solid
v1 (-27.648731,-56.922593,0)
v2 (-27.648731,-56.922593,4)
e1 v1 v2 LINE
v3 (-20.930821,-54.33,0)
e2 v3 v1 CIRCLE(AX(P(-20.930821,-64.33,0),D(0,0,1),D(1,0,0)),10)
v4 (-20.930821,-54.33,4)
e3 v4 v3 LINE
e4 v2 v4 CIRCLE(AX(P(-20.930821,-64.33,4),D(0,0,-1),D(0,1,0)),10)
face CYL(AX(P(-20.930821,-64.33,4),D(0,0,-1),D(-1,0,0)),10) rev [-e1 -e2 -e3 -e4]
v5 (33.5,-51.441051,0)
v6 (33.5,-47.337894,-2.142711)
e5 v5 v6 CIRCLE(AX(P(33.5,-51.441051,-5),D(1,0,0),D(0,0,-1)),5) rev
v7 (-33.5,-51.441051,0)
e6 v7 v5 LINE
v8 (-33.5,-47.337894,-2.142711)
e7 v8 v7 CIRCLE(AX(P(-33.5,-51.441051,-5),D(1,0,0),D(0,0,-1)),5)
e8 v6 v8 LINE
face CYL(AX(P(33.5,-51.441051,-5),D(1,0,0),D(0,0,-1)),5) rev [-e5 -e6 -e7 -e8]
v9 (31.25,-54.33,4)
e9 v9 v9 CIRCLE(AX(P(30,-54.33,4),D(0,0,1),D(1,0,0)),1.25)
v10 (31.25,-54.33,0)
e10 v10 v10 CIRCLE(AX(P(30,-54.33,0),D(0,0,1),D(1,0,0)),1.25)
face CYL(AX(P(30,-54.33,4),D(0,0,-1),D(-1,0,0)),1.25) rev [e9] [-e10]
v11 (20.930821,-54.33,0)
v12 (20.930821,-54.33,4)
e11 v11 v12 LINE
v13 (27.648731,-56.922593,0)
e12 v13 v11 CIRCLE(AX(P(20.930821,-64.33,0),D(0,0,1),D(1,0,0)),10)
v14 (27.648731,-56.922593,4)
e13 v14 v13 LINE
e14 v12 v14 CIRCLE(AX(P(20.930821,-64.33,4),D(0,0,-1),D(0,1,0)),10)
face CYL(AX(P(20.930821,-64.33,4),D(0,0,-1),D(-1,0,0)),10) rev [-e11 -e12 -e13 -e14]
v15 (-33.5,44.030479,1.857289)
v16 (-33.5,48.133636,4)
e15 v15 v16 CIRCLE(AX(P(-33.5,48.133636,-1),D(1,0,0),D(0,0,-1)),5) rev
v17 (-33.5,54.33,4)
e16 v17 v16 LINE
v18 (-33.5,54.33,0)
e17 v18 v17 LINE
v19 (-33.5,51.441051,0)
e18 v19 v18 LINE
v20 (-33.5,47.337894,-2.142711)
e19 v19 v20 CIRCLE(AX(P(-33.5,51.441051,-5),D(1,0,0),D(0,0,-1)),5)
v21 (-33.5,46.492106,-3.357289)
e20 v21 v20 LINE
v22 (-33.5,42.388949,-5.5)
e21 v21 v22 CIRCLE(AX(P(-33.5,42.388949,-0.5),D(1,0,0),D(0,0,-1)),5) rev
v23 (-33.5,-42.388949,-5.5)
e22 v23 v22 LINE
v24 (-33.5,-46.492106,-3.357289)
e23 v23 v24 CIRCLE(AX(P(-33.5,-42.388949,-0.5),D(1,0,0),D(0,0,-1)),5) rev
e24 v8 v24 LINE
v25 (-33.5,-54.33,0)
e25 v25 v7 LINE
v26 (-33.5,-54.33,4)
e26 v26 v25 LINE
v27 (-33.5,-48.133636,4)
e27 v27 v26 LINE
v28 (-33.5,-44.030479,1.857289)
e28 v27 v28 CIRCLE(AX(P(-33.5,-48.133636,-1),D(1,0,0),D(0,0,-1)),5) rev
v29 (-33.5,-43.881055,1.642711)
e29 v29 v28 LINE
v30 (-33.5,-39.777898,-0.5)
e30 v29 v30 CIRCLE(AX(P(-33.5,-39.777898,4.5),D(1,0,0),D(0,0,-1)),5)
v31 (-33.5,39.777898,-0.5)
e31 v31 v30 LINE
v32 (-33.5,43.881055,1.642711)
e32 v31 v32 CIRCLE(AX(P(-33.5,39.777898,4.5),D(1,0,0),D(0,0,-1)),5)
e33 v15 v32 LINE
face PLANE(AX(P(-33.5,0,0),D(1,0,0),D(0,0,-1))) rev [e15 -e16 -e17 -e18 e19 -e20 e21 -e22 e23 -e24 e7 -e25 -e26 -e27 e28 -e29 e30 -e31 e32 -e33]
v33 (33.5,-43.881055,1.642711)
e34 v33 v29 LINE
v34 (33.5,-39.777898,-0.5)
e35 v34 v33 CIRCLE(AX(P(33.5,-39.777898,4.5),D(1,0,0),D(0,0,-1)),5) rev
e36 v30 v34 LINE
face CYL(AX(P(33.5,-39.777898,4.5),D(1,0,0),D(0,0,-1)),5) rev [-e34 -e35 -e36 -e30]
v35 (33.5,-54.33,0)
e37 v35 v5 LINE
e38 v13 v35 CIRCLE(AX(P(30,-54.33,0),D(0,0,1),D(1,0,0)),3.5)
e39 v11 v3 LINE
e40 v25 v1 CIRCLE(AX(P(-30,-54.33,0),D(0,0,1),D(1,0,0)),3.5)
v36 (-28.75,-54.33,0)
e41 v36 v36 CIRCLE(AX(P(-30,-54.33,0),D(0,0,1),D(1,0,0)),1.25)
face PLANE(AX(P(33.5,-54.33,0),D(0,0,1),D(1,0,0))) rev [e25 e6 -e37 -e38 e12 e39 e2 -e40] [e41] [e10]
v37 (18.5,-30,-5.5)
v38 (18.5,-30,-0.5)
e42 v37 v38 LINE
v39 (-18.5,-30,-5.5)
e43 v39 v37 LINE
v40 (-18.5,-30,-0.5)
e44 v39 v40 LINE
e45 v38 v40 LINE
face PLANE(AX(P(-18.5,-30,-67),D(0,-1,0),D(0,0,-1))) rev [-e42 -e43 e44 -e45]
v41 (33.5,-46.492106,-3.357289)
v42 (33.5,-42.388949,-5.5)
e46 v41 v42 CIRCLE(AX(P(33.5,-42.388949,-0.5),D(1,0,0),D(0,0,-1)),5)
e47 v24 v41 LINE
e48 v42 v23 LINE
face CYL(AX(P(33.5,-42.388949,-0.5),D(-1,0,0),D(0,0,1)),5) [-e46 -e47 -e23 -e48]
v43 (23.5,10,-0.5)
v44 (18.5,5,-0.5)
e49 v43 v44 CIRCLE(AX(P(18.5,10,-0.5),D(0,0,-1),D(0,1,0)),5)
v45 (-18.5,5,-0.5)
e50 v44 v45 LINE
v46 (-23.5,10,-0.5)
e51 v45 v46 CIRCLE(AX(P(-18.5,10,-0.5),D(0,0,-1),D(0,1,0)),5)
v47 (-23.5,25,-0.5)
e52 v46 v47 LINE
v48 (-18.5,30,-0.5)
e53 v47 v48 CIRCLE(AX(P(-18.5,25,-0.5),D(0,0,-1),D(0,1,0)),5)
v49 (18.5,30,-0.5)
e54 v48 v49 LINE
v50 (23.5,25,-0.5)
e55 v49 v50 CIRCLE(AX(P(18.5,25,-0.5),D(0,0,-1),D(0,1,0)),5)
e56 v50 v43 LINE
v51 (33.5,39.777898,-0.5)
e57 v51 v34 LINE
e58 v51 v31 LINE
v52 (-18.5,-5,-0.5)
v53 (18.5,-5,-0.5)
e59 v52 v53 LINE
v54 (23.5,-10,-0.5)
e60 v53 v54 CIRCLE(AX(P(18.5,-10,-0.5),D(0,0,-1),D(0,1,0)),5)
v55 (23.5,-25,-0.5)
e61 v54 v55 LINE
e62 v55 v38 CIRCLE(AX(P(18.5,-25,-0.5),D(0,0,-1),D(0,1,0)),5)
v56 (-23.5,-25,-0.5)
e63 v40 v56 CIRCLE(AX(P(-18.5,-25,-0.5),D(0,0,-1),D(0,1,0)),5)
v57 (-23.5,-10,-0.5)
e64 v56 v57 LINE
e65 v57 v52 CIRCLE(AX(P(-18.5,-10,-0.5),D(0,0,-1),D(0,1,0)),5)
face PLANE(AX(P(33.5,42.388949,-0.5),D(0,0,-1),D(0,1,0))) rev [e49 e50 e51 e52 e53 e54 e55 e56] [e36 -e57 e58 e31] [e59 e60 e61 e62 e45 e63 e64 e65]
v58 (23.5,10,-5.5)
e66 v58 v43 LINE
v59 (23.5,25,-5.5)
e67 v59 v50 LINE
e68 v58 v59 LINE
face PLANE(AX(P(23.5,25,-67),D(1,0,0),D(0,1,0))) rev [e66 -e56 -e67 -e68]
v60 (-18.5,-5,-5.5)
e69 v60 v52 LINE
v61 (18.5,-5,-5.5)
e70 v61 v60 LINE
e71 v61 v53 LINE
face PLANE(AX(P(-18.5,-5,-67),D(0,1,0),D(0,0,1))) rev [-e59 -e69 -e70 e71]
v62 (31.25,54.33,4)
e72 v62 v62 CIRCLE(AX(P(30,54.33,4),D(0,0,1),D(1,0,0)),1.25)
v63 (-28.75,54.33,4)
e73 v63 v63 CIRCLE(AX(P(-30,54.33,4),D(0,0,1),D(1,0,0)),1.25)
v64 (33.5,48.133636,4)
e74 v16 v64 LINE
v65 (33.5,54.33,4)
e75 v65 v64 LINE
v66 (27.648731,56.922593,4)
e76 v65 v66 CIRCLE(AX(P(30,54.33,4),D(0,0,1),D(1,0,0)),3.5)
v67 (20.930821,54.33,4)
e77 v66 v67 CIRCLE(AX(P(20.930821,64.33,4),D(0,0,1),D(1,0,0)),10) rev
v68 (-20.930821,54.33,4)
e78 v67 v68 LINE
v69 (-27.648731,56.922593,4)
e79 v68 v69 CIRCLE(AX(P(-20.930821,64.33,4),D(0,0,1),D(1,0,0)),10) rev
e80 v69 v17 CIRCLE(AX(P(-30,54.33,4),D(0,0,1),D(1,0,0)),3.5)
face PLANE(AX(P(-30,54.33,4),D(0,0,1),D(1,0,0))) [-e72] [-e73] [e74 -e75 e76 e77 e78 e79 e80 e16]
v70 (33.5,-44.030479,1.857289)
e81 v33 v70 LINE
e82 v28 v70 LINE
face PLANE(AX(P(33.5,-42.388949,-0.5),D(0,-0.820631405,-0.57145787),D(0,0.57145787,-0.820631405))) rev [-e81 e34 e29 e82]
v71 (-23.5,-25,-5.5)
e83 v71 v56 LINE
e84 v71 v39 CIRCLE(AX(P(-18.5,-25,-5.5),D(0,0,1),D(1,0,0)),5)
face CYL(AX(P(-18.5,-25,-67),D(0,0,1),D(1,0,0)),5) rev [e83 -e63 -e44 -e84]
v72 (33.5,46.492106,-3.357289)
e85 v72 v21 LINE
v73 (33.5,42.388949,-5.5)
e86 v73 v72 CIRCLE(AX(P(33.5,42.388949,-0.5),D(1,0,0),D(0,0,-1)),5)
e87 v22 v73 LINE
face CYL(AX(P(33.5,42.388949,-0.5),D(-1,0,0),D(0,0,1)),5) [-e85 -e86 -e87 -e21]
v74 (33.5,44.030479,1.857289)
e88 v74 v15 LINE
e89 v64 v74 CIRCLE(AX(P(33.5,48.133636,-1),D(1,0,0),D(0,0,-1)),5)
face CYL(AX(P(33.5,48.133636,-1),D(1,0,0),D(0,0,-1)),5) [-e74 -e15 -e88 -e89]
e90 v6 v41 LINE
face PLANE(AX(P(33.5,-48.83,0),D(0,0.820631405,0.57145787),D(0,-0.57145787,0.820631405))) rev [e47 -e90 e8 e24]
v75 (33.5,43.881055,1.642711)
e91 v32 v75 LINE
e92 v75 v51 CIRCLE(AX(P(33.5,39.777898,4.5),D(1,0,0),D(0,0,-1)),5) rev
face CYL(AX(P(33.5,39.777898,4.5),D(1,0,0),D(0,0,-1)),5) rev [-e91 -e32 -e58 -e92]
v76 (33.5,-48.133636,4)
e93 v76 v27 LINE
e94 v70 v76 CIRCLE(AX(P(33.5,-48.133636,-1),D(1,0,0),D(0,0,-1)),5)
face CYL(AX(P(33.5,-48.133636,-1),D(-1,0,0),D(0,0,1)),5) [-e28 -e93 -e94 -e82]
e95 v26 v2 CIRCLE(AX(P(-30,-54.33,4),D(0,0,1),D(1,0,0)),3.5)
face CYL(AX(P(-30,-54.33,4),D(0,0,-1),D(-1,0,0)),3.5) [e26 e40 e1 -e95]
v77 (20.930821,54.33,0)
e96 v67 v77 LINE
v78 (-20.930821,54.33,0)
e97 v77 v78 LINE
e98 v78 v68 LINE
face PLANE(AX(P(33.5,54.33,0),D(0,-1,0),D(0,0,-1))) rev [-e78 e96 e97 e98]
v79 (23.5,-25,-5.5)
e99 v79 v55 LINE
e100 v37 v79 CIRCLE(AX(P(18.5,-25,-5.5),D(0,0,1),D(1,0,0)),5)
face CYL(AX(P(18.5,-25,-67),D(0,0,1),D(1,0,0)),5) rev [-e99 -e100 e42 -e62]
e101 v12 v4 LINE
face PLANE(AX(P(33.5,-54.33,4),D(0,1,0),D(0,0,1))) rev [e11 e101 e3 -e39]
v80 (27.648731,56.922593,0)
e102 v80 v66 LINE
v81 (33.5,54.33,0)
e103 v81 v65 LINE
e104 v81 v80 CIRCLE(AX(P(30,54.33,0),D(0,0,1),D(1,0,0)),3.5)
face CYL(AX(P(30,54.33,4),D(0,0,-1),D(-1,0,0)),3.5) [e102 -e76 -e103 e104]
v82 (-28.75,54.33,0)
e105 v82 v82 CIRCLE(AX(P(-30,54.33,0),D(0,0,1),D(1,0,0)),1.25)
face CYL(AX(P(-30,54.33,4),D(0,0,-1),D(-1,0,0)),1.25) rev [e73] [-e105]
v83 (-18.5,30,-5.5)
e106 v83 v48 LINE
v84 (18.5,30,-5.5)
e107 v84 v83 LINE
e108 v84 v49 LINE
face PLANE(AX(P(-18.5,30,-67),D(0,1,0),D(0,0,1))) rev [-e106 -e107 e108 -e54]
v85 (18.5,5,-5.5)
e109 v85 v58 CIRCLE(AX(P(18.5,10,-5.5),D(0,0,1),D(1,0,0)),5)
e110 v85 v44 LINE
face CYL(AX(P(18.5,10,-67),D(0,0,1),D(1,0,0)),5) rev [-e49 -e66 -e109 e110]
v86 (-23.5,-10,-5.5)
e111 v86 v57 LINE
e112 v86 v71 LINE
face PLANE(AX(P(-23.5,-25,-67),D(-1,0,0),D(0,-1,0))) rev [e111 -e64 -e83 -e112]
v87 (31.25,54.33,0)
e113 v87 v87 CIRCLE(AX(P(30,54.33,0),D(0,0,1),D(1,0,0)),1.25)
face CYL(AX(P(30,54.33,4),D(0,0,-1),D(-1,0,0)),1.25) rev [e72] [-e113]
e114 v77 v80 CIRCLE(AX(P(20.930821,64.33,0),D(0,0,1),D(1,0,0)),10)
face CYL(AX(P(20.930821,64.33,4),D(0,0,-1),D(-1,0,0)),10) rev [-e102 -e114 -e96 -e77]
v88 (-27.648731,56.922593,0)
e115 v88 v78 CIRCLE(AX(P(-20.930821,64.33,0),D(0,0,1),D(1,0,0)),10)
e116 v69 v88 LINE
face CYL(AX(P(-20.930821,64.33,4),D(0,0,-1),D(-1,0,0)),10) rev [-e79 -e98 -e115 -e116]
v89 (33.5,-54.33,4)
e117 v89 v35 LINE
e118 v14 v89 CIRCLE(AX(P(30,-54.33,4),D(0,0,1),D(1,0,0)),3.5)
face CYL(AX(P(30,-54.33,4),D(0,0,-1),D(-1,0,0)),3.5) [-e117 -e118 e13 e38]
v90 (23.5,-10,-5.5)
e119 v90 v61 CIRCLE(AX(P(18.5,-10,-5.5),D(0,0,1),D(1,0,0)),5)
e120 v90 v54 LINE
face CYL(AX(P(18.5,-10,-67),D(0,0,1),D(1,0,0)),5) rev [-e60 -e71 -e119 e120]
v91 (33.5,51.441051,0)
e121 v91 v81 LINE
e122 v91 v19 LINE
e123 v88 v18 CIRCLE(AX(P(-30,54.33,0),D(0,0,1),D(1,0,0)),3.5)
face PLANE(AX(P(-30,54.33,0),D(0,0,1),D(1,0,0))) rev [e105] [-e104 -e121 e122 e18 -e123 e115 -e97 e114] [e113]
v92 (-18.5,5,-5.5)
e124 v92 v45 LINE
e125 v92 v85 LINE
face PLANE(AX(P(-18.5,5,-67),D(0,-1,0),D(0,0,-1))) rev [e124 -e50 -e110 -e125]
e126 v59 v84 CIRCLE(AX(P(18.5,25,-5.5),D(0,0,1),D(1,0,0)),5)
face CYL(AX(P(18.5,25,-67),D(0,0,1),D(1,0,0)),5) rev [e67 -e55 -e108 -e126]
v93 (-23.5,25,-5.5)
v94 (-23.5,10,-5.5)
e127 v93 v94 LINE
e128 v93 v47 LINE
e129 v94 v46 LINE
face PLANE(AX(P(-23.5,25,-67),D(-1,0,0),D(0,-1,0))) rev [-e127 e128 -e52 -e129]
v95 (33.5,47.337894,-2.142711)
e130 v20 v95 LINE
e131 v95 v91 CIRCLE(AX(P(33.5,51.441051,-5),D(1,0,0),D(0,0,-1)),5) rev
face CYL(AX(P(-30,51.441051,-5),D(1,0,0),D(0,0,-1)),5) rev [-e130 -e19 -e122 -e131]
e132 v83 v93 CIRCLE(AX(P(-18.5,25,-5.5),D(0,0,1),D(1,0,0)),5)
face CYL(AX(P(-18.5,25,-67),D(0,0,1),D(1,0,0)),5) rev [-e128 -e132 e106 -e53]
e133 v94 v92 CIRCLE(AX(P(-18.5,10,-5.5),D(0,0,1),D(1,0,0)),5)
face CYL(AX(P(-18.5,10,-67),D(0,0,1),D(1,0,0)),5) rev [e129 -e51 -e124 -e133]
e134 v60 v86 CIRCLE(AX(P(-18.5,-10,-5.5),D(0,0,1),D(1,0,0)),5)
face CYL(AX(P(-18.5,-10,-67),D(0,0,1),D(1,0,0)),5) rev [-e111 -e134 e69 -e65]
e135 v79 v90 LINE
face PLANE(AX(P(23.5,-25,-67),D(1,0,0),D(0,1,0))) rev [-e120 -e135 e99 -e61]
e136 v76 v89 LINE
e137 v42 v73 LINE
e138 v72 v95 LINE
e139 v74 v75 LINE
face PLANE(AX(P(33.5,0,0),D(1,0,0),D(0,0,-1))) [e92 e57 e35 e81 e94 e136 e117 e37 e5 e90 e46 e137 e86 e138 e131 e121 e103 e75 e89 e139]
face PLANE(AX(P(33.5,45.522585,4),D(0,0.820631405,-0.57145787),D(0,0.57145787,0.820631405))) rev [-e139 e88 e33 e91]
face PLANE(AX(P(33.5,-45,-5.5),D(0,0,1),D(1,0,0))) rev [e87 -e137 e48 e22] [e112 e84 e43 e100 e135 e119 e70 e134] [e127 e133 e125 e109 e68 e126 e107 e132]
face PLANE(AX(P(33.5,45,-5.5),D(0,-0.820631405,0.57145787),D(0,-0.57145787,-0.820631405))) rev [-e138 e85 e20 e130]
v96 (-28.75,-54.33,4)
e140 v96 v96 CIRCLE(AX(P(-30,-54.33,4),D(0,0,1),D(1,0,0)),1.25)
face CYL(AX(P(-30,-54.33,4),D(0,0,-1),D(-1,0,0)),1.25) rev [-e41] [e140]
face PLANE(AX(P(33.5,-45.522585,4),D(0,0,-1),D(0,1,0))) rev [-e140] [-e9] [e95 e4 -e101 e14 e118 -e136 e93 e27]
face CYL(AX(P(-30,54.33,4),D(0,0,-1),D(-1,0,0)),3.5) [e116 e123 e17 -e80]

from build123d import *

# Parameters (mm, degrees)
SKETCH1_R                    = 3.5
SKETCH1_R_2                  = 1.25
MOUNTING_BOSSES_DEPTH        = 4
MOUNTING_BOSSES_2_DEPTH      = 4
MOUNTING_BOSSES_3_DEPTH      = 4
MOUNTING_BOSSES_4_DEPTH      = 4
MATERIAL_BULK_DEPTH          = 33.5
SKETCH5_R                    = 1.25
MOUNT_POINT_CUT_REPEAT_DEPTH = 67
WEIGHT_RELIEF_DEPTH          = 67
FILLET2_R                    = 5
FILLET3_R                    = 10


with BuildPart() as part:
    # Sketch1 → MOUNTING BOSSES (new body)
    with BuildSketch(Plane.XY):
        with Locations((-30, 54.33)):
            Circle(SKETCH1_R)
        with Locations((-30, 54.33)):
            Circle(SKETCH1_R_2, mode=Mode.SUBTRACT)
    extrude(amount=MOUNTING_BOSSES_DEPTH)



with BuildPart() as body_2:
    # Sketch1 → MOUNTING BOSSES 2 (new body)
    with BuildSketch(Plane.XY):
        with Locations((30, 54.33)):
            Circle(SKETCH1_R)
        with Locations((30, 54.33)):
            Circle(SKETCH1_R_2, mode=Mode.SUBTRACT)
    extrude(amount=MOUNTING_BOSSES_2_DEPTH)


with BuildPart() as body_3:
    # Sketch1 → MOUNTING BOSSES 3 (new body)
    with BuildSketch(Plane.XY):
        with Locations((30, -54.33)):
            Circle(SKETCH1_R)
        with Locations((30, -54.33)):
            Circle(SKETCH1_R_2, mode=Mode.SUBTRACT)
    extrude(amount=MOUNTING_BOSSES_3_DEPTH)


with BuildPart() as body_4:
    # Sketch1 → MOUNTING BOSSES 4 (new body)
    with BuildSketch(Plane.XY):
        with Locations((-30, -54.33)):
            Circle(SKETCH1_R)
        with Locations((-30, -54.33)):
            Circle(SKETCH1_R_2, mode=Mode.SUBTRACT)
    extrude(amount=MOUNTING_BOSSES_4_DEPTH)


with BuildPart() as part_1:
    add(part.part)

    add(body_2.part)  # MATERIAL BULK merges body 2

    add(body_3.part)  # MATERIAL BULK merges body 3

    add(body_4.part)  # MATERIAL BULK merges body 4
    # Sketch4 → MATERIAL BULK (add, symmetric)
    with BuildSketch(Plane(origin=(0, 0, 0), x_dir=(0, 0, -1), z_dir=(1, 0, 0))):
        Polygon((-4, 54.33), (-4, 45.522585119), (0.5, 42.388948755), (0.5, -42.388948755), (-4, -45.522585119), (-4, -54.33), (0, -54.33), (0, -48.83), (5.5, -45), (5.5, 45), (0, 48.83), (0, 54.33), align=None)
    extrude(amount=MATERIAL_BULK_DEPTH, both=True)

    # Sketch5 → MOUNT POINT CUT REPEAT (cut)
    with BuildSketch(Plane.XY):
        with Locations((-30, 54.33)):
            Circle(SKETCH5_R)
        with Locations((30, 54.33)):
            Circle(SKETCH5_R)
        with Locations((30, -54.33)):
            Circle(SKETCH5_R)
        with Locations((-30, -54.33)):
            Circle(SKETCH5_R)
    extrude(amount=MOUNT_POINT_CUT_REPEAT_DEPTH, mode=Mode.SUBTRACT)

    # Sketch6 → WEIGHT RELIEF (cut)
    with BuildSketch(Plane.XY):
        with BuildLine():
            Line((-18.5, 30), (18.5, 30))
            ThreePointArc((18.5, 30), (22.035533906, 28.535533906), (23.5, 25))
            Line((23.5, 25), (23.5, 10))
            ThreePointArc((23.5, 10), (22.035533906, 6.464466094), (18.5, 5))
            Line((18.5, 5), (-18.5, 5))
            ThreePointArc((-18.5, 5), (-22.035533906, 6.464466094), (-23.5, 10))
            Line((-23.5, 10), (-23.5, 25))
            ThreePointArc((-23.5, 25), (-22.035533906, 28.535533906), (-18.5, 30))
        make_face()
        with BuildLine():
            Line((-18.5, -5), (18.5, -5))
            ThreePointArc((18.5, -5), (22.035533906, -6.464466094), (23.5, -10))
            Line((23.5, -10), (23.5, -25))
            ThreePointArc((23.5, -25), (22.035533906, -28.535533906), (18.5, -30))
            Line((18.5, -30), (-18.5, -30))
            ThreePointArc((-18.5, -30), (-22.035533906, -28.535533906), (-23.5, -25))
            Line((-23.5, -25), (-23.5, -10))
            ThreePointArc((-23.5, -10), (-22.035533906, -6.464466094), (-18.5, -5))
        make_face()
    extrude(amount=-WEIGHT_RELIEF_DEPTH, mode=Mode.SUBTRACT)

    # Fillet2
    fillet2_edges = [part_1.edges().sort_by_distance(p)[0] for p in [
        (0, 45.522585119, 4),
        (0, 42.388948755, -0.5),
        (0, -42.388948755, -0.5),
        (0, -45.522585119, 4),
        (0, -48.83, 0),
        (0, -45, -5.5),
        (0, 45, -5.5),
        (0, 48.83, 0),
    ]]
    fillet(fillet2_edges, radius=FILLET2_R)

    # Fillet3
    fillet3_edges = [part_1.edges().sort_by_distance(p)[0] for p in [
        (-26.5, 54.33, 2),
        (26.5, 54.33, 2),
        (26.5, -54.33, 2),
        (-26.5, -54.33, 2),
    ]]
    fillet(fillet3_edges, radius=FILLET3_R)


solid = part_1.part
